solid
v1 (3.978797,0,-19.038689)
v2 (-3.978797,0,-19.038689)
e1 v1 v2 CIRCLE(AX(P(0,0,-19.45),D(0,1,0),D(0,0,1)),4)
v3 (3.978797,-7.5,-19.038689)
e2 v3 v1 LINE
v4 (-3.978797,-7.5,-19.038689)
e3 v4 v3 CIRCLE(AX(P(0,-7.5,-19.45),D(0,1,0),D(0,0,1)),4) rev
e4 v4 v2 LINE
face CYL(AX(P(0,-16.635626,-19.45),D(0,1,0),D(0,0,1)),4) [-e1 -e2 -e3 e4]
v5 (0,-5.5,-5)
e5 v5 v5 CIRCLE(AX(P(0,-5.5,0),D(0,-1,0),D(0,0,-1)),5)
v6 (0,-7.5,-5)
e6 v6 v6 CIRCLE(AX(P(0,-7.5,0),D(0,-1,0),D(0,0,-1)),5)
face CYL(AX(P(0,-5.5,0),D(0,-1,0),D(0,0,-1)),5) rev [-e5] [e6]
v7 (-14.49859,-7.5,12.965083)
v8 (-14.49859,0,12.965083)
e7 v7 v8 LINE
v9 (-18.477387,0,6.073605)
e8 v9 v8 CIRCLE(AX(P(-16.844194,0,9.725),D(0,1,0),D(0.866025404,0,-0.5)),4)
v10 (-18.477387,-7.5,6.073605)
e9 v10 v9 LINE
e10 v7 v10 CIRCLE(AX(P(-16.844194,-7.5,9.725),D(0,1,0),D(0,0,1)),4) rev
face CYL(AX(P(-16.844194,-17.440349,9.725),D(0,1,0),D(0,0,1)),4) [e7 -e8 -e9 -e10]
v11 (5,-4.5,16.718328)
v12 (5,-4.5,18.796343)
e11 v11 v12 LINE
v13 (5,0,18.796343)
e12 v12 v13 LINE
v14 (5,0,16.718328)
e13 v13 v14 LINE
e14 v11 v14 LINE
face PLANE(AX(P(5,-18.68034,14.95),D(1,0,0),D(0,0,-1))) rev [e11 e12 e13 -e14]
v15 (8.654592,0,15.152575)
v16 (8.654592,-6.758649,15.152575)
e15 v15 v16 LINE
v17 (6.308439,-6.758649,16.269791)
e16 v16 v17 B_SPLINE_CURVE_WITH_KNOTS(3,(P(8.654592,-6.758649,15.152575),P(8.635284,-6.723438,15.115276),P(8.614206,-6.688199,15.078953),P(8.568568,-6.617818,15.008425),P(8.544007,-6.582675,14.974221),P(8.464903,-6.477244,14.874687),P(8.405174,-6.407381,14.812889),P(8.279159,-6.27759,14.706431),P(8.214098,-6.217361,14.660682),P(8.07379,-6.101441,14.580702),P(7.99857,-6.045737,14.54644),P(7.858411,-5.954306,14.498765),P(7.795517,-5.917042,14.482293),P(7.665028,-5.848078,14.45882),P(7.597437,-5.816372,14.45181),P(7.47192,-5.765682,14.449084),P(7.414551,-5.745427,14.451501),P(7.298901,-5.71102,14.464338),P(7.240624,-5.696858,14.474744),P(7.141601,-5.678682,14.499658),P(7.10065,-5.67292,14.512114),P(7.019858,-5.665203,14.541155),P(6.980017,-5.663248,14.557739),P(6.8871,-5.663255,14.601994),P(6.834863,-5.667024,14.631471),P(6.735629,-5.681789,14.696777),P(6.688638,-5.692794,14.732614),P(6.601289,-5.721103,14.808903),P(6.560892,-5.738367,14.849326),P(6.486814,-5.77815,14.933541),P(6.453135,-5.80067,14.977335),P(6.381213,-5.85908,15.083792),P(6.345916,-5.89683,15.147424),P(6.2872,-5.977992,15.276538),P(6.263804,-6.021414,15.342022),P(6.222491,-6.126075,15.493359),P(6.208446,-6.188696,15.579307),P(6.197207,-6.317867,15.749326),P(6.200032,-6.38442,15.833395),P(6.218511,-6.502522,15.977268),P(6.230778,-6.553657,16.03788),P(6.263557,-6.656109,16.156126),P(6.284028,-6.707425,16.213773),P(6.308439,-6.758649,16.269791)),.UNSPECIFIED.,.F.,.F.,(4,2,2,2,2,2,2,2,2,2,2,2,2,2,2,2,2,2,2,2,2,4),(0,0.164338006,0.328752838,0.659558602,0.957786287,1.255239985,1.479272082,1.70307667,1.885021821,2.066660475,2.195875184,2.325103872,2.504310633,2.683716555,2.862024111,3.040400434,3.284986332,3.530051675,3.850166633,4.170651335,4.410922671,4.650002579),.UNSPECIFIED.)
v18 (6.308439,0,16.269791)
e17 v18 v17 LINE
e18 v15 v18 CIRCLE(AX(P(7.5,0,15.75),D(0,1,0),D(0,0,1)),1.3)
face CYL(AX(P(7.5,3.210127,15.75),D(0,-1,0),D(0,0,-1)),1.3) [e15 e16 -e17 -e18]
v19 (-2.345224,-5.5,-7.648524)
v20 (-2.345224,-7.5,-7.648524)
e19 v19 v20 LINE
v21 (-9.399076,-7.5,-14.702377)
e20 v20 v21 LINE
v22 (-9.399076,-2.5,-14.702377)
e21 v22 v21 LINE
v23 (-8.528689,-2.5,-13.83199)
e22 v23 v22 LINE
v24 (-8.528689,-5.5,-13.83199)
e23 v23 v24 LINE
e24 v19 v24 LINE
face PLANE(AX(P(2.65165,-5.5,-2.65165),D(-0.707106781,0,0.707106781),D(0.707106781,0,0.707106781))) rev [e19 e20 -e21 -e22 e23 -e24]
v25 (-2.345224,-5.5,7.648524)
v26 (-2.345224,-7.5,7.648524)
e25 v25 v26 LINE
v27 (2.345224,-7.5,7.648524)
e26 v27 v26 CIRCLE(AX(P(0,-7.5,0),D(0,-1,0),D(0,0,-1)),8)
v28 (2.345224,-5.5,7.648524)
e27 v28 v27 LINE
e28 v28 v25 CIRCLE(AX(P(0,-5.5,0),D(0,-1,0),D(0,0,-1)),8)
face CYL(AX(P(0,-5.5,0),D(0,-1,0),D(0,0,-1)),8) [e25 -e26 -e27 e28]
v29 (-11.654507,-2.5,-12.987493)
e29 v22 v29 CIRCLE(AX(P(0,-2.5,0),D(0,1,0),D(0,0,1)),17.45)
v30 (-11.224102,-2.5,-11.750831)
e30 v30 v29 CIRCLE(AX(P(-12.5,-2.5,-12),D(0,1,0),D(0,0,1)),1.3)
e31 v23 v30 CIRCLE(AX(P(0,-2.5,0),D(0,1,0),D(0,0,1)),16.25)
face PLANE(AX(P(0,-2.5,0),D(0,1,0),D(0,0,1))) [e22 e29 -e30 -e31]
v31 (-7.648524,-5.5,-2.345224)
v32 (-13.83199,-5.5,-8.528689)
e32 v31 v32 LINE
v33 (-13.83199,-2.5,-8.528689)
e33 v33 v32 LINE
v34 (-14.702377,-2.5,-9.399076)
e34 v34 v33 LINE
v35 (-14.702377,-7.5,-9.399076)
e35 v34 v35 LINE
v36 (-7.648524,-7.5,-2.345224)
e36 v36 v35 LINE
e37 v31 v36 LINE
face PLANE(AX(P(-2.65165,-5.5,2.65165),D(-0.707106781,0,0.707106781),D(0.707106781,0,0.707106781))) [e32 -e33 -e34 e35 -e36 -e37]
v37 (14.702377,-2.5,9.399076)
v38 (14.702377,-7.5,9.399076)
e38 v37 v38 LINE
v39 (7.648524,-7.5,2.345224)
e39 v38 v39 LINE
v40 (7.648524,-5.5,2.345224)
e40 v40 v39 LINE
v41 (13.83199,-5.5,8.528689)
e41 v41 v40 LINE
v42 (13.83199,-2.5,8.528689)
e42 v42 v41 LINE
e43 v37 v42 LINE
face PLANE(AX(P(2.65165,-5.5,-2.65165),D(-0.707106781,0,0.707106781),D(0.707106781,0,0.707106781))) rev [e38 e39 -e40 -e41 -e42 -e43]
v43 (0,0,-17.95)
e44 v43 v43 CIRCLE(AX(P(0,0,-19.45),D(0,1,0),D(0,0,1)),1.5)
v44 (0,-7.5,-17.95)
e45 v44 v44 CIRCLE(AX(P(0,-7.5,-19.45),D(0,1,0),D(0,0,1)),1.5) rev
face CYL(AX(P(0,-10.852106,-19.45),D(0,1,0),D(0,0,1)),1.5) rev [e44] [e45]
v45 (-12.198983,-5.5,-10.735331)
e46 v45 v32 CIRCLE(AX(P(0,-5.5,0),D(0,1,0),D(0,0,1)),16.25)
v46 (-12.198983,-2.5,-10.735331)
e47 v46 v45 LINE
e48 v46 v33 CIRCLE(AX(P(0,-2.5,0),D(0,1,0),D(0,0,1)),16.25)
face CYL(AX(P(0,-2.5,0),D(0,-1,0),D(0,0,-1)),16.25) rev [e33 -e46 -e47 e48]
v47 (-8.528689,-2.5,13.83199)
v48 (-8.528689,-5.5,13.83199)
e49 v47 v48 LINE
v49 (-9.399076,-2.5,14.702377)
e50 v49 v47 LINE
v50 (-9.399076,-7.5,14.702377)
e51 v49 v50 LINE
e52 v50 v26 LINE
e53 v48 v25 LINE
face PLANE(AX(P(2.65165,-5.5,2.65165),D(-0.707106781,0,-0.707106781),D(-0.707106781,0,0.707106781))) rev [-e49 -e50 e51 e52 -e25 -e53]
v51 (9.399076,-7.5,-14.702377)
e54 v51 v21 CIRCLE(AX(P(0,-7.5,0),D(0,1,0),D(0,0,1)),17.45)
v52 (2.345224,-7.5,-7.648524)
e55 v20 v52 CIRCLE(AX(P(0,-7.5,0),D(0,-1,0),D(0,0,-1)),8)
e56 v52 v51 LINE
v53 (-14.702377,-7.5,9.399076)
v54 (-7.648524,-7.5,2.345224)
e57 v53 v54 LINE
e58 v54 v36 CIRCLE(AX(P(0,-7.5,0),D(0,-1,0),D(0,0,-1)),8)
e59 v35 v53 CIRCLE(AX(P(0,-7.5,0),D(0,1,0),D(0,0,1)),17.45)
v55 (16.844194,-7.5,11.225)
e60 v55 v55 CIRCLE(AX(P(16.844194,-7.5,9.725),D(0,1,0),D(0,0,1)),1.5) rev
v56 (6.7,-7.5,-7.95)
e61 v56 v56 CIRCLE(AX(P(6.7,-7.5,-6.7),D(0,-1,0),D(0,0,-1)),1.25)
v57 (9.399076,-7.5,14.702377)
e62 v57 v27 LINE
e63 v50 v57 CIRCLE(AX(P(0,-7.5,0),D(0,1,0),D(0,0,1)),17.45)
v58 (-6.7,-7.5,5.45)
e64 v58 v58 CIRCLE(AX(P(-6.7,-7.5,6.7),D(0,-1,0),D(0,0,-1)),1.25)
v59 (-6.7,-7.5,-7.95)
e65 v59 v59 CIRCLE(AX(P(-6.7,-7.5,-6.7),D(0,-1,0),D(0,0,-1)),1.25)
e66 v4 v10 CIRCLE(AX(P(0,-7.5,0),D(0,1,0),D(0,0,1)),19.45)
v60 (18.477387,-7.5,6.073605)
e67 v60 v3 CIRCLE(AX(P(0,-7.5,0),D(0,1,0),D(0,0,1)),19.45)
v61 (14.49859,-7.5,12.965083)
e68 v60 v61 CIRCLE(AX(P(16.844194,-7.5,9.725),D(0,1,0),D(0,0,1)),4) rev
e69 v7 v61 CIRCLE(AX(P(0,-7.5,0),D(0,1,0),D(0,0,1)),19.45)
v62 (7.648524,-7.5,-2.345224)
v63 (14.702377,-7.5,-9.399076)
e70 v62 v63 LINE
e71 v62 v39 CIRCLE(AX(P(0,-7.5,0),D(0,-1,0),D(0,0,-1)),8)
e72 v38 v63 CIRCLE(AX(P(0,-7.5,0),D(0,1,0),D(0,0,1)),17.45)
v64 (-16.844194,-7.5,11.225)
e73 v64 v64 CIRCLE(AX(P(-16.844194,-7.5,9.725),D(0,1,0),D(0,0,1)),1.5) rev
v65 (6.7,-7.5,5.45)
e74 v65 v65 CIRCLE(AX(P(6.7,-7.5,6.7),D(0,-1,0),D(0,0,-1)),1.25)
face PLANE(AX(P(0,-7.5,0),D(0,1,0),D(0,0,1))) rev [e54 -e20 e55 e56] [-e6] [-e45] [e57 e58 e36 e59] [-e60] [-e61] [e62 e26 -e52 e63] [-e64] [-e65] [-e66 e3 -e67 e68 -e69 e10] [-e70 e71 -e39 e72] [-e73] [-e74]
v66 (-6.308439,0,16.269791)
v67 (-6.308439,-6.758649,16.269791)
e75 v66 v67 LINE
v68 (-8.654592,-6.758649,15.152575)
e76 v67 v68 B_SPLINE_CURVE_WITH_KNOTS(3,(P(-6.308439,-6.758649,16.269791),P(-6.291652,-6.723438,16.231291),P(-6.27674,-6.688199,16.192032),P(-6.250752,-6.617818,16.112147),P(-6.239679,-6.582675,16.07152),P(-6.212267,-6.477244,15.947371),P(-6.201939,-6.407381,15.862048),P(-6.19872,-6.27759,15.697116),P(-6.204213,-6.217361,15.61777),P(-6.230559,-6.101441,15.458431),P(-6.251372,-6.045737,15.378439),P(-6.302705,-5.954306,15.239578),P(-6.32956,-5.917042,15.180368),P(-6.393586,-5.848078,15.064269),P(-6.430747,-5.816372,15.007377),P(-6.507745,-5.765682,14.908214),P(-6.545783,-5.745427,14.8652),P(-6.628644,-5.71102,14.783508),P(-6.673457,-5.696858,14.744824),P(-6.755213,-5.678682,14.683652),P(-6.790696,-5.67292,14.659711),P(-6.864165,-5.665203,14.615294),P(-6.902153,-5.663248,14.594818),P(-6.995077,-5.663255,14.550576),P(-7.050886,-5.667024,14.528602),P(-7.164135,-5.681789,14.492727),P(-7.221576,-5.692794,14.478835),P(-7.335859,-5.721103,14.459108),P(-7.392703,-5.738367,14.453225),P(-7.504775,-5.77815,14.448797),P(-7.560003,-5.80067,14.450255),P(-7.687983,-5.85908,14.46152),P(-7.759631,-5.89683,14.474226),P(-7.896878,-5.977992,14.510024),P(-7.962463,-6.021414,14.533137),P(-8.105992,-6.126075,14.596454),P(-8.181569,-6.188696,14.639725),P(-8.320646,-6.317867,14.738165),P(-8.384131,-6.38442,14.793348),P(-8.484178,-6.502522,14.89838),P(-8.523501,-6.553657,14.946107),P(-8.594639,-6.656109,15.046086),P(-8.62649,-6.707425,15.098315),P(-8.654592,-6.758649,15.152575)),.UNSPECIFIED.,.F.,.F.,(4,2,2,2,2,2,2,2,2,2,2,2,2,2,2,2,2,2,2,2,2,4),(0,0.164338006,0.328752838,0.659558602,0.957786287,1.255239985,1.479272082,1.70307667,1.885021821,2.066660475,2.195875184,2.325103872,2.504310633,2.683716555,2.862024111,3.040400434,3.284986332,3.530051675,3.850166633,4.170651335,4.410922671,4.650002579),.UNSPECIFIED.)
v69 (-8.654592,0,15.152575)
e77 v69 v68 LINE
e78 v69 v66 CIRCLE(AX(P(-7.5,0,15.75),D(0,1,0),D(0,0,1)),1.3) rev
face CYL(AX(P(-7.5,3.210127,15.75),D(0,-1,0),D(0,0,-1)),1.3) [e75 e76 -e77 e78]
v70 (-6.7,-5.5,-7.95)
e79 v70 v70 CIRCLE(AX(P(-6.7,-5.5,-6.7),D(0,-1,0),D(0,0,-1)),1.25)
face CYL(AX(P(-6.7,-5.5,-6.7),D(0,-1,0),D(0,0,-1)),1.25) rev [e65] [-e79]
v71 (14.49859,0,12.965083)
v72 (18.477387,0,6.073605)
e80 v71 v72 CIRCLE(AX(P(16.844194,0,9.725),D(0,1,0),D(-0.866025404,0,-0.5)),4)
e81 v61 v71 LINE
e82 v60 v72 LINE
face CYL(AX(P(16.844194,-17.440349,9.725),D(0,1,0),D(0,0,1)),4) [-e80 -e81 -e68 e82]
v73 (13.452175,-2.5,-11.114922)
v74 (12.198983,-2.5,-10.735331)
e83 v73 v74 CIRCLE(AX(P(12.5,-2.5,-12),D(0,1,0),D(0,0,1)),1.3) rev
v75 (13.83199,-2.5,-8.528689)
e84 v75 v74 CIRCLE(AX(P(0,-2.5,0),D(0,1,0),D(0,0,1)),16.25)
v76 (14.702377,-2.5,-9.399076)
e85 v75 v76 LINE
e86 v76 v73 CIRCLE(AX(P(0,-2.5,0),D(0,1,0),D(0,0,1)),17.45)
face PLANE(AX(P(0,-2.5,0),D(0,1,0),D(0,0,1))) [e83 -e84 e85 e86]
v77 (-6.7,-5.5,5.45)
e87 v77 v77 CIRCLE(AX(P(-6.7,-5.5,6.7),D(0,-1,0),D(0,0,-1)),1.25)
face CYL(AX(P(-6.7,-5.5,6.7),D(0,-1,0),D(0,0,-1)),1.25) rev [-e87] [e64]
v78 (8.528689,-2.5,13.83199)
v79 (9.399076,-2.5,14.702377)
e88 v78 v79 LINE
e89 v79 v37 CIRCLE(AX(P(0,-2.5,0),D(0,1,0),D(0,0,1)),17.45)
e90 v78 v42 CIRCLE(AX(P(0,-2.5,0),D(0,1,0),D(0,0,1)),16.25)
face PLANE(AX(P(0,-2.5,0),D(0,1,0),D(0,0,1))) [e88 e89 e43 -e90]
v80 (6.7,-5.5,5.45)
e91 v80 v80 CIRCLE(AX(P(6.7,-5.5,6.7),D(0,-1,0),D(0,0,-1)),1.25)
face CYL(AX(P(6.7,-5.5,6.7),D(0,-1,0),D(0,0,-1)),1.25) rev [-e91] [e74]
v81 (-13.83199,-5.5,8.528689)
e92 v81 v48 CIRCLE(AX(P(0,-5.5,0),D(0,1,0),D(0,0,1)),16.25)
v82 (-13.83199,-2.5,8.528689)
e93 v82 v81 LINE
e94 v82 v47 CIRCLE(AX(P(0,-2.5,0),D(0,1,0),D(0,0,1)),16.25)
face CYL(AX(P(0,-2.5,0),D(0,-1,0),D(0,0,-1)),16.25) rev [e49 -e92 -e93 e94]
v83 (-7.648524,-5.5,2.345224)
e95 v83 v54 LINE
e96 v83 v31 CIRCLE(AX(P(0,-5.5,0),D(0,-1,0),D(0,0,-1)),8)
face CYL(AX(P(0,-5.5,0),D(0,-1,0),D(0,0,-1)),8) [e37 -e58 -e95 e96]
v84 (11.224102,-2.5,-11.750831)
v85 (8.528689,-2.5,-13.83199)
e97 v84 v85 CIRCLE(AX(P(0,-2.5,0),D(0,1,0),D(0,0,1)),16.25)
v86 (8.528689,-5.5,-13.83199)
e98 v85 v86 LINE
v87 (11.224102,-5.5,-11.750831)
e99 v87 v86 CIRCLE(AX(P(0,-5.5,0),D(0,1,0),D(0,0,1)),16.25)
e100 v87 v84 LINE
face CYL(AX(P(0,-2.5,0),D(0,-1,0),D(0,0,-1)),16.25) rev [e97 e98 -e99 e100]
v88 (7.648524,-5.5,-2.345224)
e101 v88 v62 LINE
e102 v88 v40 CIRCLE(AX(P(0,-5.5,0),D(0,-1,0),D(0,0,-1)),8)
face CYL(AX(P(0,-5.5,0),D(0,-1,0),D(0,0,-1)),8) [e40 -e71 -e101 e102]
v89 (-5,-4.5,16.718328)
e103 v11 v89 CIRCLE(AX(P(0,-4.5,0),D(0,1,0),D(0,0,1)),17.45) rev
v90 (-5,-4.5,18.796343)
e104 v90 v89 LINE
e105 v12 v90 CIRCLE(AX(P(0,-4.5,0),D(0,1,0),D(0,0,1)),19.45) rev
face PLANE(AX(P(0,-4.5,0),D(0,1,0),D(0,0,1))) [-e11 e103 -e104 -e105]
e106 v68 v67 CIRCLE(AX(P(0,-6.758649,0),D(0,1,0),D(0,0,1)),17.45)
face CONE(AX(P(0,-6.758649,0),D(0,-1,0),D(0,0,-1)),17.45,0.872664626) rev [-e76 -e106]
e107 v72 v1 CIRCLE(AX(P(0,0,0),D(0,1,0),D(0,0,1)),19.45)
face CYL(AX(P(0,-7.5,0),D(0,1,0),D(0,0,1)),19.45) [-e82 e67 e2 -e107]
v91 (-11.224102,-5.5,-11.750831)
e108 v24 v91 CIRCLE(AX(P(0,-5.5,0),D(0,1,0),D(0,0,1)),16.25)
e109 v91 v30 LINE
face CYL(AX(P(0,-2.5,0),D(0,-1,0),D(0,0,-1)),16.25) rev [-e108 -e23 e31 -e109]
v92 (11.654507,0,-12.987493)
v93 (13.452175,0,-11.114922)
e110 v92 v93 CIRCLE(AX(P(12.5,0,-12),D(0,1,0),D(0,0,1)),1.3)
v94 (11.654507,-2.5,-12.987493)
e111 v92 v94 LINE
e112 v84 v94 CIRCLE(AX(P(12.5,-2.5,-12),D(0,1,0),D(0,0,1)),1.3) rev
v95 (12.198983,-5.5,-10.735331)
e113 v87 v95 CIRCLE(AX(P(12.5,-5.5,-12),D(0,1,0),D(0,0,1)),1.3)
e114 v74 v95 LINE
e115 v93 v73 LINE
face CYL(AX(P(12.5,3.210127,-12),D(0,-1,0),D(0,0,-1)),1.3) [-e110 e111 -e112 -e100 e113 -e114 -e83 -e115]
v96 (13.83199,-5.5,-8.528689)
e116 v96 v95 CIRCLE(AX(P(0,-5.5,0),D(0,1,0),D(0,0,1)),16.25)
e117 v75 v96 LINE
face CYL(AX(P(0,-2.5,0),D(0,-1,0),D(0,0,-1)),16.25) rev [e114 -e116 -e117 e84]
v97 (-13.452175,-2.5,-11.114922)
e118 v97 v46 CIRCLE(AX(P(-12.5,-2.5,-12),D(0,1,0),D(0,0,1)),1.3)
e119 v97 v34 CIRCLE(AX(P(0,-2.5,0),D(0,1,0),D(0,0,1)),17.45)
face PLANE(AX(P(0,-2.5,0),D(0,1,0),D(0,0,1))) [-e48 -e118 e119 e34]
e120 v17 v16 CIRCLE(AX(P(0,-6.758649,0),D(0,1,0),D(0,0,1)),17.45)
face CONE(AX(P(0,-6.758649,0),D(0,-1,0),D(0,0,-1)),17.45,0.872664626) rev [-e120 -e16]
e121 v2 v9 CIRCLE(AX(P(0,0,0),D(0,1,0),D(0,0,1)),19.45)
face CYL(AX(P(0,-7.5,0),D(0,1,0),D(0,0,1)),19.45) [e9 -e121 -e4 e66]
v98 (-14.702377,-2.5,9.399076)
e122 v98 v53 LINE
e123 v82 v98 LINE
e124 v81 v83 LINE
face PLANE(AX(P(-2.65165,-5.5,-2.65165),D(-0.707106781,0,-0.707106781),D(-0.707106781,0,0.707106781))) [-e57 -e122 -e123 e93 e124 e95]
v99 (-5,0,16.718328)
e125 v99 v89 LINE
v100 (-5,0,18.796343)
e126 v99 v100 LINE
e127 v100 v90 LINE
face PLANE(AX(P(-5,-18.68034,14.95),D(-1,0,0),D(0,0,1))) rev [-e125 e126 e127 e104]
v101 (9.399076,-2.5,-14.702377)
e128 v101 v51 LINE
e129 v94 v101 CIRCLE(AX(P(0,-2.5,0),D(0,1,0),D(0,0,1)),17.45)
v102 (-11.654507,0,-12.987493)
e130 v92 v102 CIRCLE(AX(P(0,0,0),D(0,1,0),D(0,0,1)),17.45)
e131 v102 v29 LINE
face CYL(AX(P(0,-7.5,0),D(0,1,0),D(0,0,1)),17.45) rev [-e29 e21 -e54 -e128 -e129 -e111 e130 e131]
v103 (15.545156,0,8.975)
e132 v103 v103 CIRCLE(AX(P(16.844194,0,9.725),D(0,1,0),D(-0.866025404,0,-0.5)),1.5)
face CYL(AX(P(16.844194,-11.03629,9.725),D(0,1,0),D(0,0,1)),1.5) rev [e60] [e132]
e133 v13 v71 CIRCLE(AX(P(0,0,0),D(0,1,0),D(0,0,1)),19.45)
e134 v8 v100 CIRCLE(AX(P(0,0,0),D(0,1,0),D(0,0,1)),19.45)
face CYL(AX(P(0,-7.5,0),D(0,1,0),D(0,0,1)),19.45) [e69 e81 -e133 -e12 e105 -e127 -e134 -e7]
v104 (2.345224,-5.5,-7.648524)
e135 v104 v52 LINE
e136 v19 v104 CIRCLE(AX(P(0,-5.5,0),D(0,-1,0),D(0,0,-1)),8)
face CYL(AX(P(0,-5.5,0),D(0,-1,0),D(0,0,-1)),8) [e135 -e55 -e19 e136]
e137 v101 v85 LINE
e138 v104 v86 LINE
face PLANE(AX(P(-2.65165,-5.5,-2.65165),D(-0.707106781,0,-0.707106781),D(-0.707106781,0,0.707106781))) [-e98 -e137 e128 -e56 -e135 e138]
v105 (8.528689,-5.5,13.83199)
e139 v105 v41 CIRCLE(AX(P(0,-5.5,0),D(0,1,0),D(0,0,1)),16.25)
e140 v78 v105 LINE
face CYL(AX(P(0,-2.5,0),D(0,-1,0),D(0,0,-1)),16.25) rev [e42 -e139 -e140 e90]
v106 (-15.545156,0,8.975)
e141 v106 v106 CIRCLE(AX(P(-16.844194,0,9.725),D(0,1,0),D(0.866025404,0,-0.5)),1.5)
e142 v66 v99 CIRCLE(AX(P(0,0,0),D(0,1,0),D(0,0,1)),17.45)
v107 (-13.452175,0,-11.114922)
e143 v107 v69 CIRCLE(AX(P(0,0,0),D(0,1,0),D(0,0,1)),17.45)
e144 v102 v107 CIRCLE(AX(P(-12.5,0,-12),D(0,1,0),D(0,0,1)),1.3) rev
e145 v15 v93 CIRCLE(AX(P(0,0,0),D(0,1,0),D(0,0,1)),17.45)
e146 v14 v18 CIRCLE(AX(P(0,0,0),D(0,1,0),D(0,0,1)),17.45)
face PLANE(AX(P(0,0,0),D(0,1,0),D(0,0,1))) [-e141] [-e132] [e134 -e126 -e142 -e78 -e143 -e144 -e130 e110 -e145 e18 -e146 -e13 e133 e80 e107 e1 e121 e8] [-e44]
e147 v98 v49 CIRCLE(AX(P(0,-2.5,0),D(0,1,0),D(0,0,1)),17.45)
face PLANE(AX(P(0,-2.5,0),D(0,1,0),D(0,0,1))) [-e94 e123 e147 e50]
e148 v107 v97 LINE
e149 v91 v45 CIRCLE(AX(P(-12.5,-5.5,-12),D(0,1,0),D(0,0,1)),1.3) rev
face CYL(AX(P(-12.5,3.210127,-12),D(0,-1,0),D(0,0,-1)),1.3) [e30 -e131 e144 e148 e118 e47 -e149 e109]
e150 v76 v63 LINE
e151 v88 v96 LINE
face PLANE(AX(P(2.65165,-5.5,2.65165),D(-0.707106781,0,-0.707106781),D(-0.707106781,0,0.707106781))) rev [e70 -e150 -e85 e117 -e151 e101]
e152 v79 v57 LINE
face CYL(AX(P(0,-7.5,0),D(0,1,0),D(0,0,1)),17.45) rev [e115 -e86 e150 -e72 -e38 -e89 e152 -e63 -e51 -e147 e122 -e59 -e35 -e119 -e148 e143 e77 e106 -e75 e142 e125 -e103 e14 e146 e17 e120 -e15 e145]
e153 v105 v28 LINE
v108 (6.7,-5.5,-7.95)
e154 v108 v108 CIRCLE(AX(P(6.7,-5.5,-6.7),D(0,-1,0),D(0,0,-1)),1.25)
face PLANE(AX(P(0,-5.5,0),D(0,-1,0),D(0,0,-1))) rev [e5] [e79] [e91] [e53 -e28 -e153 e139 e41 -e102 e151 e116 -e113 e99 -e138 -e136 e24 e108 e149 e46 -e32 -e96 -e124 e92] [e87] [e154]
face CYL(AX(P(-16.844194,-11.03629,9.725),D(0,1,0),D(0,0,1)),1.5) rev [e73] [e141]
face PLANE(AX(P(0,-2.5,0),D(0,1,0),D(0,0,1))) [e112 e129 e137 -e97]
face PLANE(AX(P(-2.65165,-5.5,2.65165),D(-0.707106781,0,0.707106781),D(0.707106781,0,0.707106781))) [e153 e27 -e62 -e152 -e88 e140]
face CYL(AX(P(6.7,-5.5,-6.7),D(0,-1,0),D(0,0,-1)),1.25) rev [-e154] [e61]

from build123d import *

# Parameters (mm, degrees)
ESQUISSE1_R                                = 19.45
ESQUISSE1_R_2                              = 17.45
BOSS_EXTRU_1_DEPTH                         = 7.5
BOSS_EXTRU_2_START                         = -2
ESQUISSE2_R                                = 1.25
BOSS_EXTRU_2_DEPTH                         = 2
BOSS_EXTRU_3_START                         = 3
BOSS_EXTRU_3_DEPTH                         = 3
BOSS_EXTRU_4_REACH                         = 30.051
CHANFREIN1_SIZE                            = 1.258649447
CHANFREIN1_SIZE_2                          = 1.5
ENL_V_MAT_EXTRU_1_DEPTH                    = 7.5
BOSS_EXTRU_5_START                         = -7.5
BOSS_EXTRU_5_DEPTH                         = 7.5
R_P_TITION_CIRCULAIRE1_COUNT               = 2
R_P_TITION_CIRCULAIRE1_ANGLE               = 120
R_P_TITION_CIRCULAIRE1_THE_OTHER_WAY_COUNT = 2
R_P_TITION_CIRCULAIRE1_THE_OTHER_WAY_ANGLE = 120
ESQUISSE6_W                                = 10
ESQUISSE6_H                                = 5
ENL_V_MAT_EXTRU_2_DEPTH                    = 4.5


with BuildPart() as part:
    # Esquisse1 → Boss.-Extru.1 (new body)
    with BuildSketch(Plane(origin=(0, 0, 0), x_dir=(1, 0, 0), z_dir=(0, 1, 0))):
        with Locations(Location((0, 0, 0), (0, 0, 270))):
            Circle(ESQUISSE1_R)
        with Locations(Location((0, 0, 0), (0, 0, 270))):
            Circle(ESQUISSE1_R_2, mode=Mode.SUBTRACT)
    extrude(amount=-BOSS_EXTRU_1_DEPTH)

    # Esquisse2 → Boss.-Extru.2 (add)
    # profile 1 of 16: a face of its own
    with BuildSketch(Plane(origin=(0, -7.5, 0), x_dir=(-1, 0, 0), z_dir=(0, -1, 0)).offset(BOSS_EXTRU_2_START)):
        with BuildLine():
            Line((2.345223593, -7.648524452), (9.39907569, -14.702376549))
            ThreePointArc((9.39907569, -14.702376549), (12.339013332, -12.339013332), (14.702376549, -9.39907569))
            Line((14.702376549, -9.39907569), (7.648524452, -2.345223593))
            ThreePointArc((7.648524452, -2.345223593), (5.656854249, -5.656854249), (2.345223593, -7.648524452))
        make_face()
        with Locations(Location((6.7, -6.7, 0), (0, 0, 90))):
            Circle(ESQUISSE2_R, mode=Mode.SUBTRACT)
    # profile 2 of 16: a face of its own
    with BuildSketch(Plane(origin=(0, -7.5, 0), x_dir=(-1, 0, 0), z_dir=(0, -1, 0)).offset(BOSS_EXTRU_2_START)):
        with BuildLine():
            Line((5.303300859, 0), (7.648524452, -2.345223593))
            ThreePointArc((7.648524452, -2.345223593), (7.91164318, -1.185707464), (8, 0))
            ThreePointArc((8, 0), (7.91164318, 1.185707464), (7.648524452, 2.345223593))
            Line((7.648524452, 2.345223593), (5.303300859, 0))
        make_face()
    # profile 3 of 16: a face of its own
    with BuildSketch(Plane(origin=(0, -7.5, 0), x_dir=(-1, 0, 0), z_dir=(0, -1, 0)).offset(BOSS_EXTRU_2_START)):
        with BuildLine():
            Line((0.313114563, -4.990186296), (0, -5.303300859))
            Line((0, -5.303300859), (2.345223593, -7.648524452))
            ThreePointArc((2.345223593, -7.648524452), (5.656854249, -5.656854249), (7.648524452, -2.345223593))
            Line((7.648524452, -2.345223593), (5.303300859, 0))
            Line((5.303300859, 0), (4.990186296, -0.313114563))
            ThreePointArc((4.990186296, -0.313114563), (3.535533906, -3.535533906), (0.313114563, -4.990186296))
        make_face()
    # profile 4 of 16: a face of its own
    with BuildSketch(Plane(origin=(0, -7.5, 0), x_dir=(-1, 0, 0), z_dir=(0, -1, 0)).offset(BOSS_EXTRU_2_START)):
        with BuildLine():
            Line((4.990186296, 0.313114563), (5.303300859, 0))
            Line((5.303300859, 0), (7.648524452, 2.345223593))
            ThreePointArc((7.648524452, 2.345223593), (5.656854249, 5.656854249), (2.345223593, 7.648524452))
            Line((2.345223593, 7.648524452), (0, 5.303300859))
            Line((0, 5.303300859), (0.313114563, 4.990186296))
            ThreePointArc((0.313114563, 4.990186296), (3.535533906, 3.535533906), (4.990186296, 0.313114563))
        make_face()
    # profile 5 of 16: a face of its own
    with BuildSketch(Plane(origin=(0, -7.5, 0), x_dir=(-1, 0, 0), z_dir=(0, -1, 0)).offset(BOSS_EXTRU_2_START)):
        with BuildLine():
            ThreePointArc((5, 0), (4.997545972, -0.156634158), (4.990186296, -0.313114563))
            Line((4.990186296, -0.313114563), (5.303300859, 0))
            Line((5.303300859, 0), (4.990186296, 0.313114563))
            ThreePointArc((4.990186296, 0.313114563), (4.997545972, 0.156634158), (5, 0))
        make_face()
    # profile 6 of 16: a face of its own
    with BuildSketch(Plane(origin=(0, -7.5, 0), x_dir=(-1, 0, 0), z_dir=(0, -1, 0)).offset(BOSS_EXTRU_2_START)):
        with BuildLine():
            ThreePointArc((14.702376549, 9.39907569), (12.339013332, 12.339013332), (9.39907569, 14.702376549))
            Line((9.39907569, 14.702376549), (2.345223593, 7.648524452))
            ThreePointArc((2.345223593, 7.648524452), (5.656854249, 5.656854249), (7.648524452, 2.345223593))
            Line((7.648524452, 2.345223593), (14.702376549, 9.39907569))
        make_face()
        with Locations(Location((6.7, 6.7, 0), (0, 0, 90))):
            Circle(ESQUISSE2_R, mode=Mode.SUBTRACT)
    # profile 7 of 16: a face of its own
    with BuildSketch(Plane(origin=(0, -7.5, 0), x_dir=(-1, 0, 0), z_dir=(0, -1, 0)).offset(BOSS_EXTRU_2_START)):
        with BuildLine():
            Line((0, 5.303300859), (-0.313114563, 4.990186296))
            ThreePointArc((-0.313114563, 4.990186296), (0, 5), (0.313114563, 4.990186296))
            Line((0.313114563, 4.990186296), (0, 5.303300859))
        make_face()
    # profile 8 of 16: a face of its own
    with BuildSketch(Plane(origin=(0, -7.5, 0), x_dir=(-1, 0, 0), z_dir=(0, -1, 0)).offset(BOSS_EXTRU_2_START)):
        with BuildLine():
            Line((-7.648524452, 2.345223593), (-5.303300859, 0))
            Line((-5.303300859, 0), (-4.990186296, 0.313114563))
            ThreePointArc((-4.990186296, 0.313114563), (-3.535533906, 3.535533906), (-0.313114563, 4.990186296))
            Line((-0.313114563, 4.990186296), (0, 5.303300859))
            Line((0, 5.303300859), (-2.345223593, 7.648524452))
            ThreePointArc((-2.345223593, 7.648524452), (-5.656854249, 5.656854249), (-7.648524452, 2.345223593))
        make_face()
    # profile 9 of 16: a face of its own
    with BuildSketch(Plane(origin=(0, -7.5, 0), x_dir=(-1, 0, 0), z_dir=(0, -1, 0)).offset(BOSS_EXTRU_2_START)):
        with BuildLine():
            Line((-4.990186296, 0.313114563), (-5.303300859, 0))
            Line((-5.303300859, 0), (-4.990186296, -0.313114563))
            ThreePointArc((-4.990186296, -0.313114563), (-5, 0), (-4.990186296, 0.313114563))
        make_face()
    # profile 10 of 16: a face of its own
    with BuildSketch(Plane(origin=(0, -7.5, 0), x_dir=(-1, 0, 0), z_dir=(0, -1, 0)).offset(BOSS_EXTRU_2_START)):
        with BuildLine():
            ThreePointArc((-7.648524452, -2.345223593), (-5.656854249, -5.656854249), (-2.345223593, -7.648524452))
            Line((-2.345223593, -7.648524452), (0, -5.303300859))
            Line((0, -5.303300859), (-0.313114563, -4.990186296))
            ThreePointArc((-0.313114563, -4.990186296), (-3.535533906, -3.535533906), (-4.990186296, -0.313114563))
            Line((-4.990186296, -0.313114563), (-5.303300859, 0))
            Line((-5.303300859, 0), (-7.648524452, -2.345223593))
        make_face()
    # profile 11 of 16: a face of its own
    with BuildSketch(Plane(origin=(0, -7.5, 0), x_dir=(-1, 0, 0), z_dir=(0, -1, 0)).offset(BOSS_EXTRU_2_START)):
        with BuildLine():
            ThreePointArc((-7.648524452, 2.345223593), (-8, 0), (-7.648524452, -2.345223593))
            Line((-7.648524452, -2.345223593), (-5.303300859, 0))
            Line((-5.303300859, 0), (-7.648524452, 2.345223593))
        make_face()
    # profile 12 of 16: a face of its own
    with BuildSketch(Plane(origin=(0, -7.5, 0), x_dir=(-1, 0, 0), z_dir=(0, -1, 0)).offset(BOSS_EXTRU_2_START)):
        with BuildLine():
            Line((-0.313114563, -4.990186296), (0, -5.303300859))
            Line((0, -5.303300859), (0.313114563, -4.990186296))
            ThreePointArc((0.313114563, -4.990186296), (0, -5), (-0.313114563, -4.990186296))
        make_face()
    # profile 13 of 16: a face of its own
    with BuildSketch(Plane(origin=(0, -7.5, 0), x_dir=(-1, 0, 0), z_dir=(0, -1, 0)).offset(BOSS_EXTRU_2_START)):
        with BuildLine():
            Line((0, -5.303300859), (-2.345223593, -7.648524452))
            ThreePointArc((-2.345223593, -7.648524452), (0, -8), (2.345223593, -7.648524452))
            Line((2.345223593, -7.648524452), (0, -5.303300859))
        make_face()
    # profile 14 of 16: a face of its own
    with BuildSketch(Plane(origin=(0, -7.5, 0), x_dir=(-1, 0, 0), z_dir=(0, -1, 0)).offset(BOSS_EXTRU_2_START)):
        with BuildLine():
            ThreePointArc((2.345223593, 7.648524452), (0, 8), (-2.345223593, 7.648524452))
            Line((-2.345223593, 7.648524452), (0, 5.303300859))
            Line((0, 5.303300859), (2.345223593, 7.648524452))
        make_face()
    # profile 15 of 16: a face of its own
    with BuildSketch(Plane(origin=(0, -7.5, 0), x_dir=(-1, 0, 0), z_dir=(0, -1, 0)).offset(BOSS_EXTRU_2_START)):
        with BuildLine():
            ThreePointArc((-9.39907569, 14.702376549), (-12.339013332, 12.339013332), (-14.702376549, 9.39907569))
            Line((-14.702376549, 9.39907569), (-7.648524452, 2.345223593))
            ThreePointArc((-7.648524452, 2.345223593), (-5.656854249, 5.656854249), (-2.345223593, 7.648524452))
            Line((-2.345223593, 7.648524452), (-9.39907569, 14.702376549))
        make_face()
        with Locations(Location((-6.7, 6.7, 0), (0, 0, 90))):
            Circle(ESQUISSE2_R, mode=Mode.SUBTRACT)
    # profile 16 of 16: a face of its own
    with BuildSketch(Plane(origin=(0, -7.5, 0), x_dir=(-1, 0, 0), z_dir=(0, -1, 0)).offset(BOSS_EXTRU_2_START)):
        with BuildLine():
            ThreePointArc((-14.702376549, -9.39907569), (-12.339013332, -12.339013332), (-9.39907569, -14.702376549))
            Line((-9.39907569, -14.702376549), (-2.345223593, -7.648524452))
            ThreePointArc((-2.345223593, -7.648524452), (-5.656854249, -5.656854249), (-7.648524452, -2.345223593))
            Line((-7.648524452, -2.345223593), (-14.702376549, -9.39907569))
        make_face()
        with Locations(Location((-6.7, -6.7, 0), (0, 0, 90))):
            Circle(ESQUISSE2_R, mode=Mode.SUBTRACT)
    extrude(amount=BOSS_EXTRU_2_DEPTH)

    # Esquisse3 → Boss.-Extru.3 (add)
    with BuildSketch(Plane(origin=(0, -5.5, 0), x_dir=(1, 0, 0), z_dir=(0, 1, 0)).offset(BOSS_EXTRU_3_START)):
        with BuildLine():
            ThreePointArc((-13.831990317, 8.528689458), (-11.490485194, 11.490485194), (-8.528689458, 13.831990317))
            Line((-8.528689458, 13.831990317), (-9.39907569, 14.702376549))
            ThreePointArc((-9.39907569, 14.702376549), (-12.339013332, 12.339013332), (-14.702376549, 9.39907569))
            Line((-14.702376549, 9.39907569), (-13.831990317, 8.528689458))
        make_face()
        with BuildLine():
            Line((9.39907569, 14.702376549), (8.528689458, 13.831990317))
            ThreePointArc((8.528689458, 13.831990317), (11.490485194, 11.490485194), (13.831990317, 8.528689458))
            Line((13.831990317, 8.528689458), (14.702376549, 9.39907569))
            ThreePointArc((14.702376549, 9.39907569), (12.339013332, 12.339013332), (9.39907569, 14.702376549))
        make_face()
        with BuildLine():
            ThreePointArc((-8.528689458, -13.831990317), (-11.490485194, -11.490485194), (-13.831990317, -8.528689458))
            Line((-13.831990317, -8.528689458), (-14.702376549, -9.39907569))
            ThreePointArc((-14.702376549, -9.39907569), (-12.339013332, -12.339013332), (-9.39907569, -14.702376549))
            Line((-9.39907569, -14.702376549), (-8.528689458, -13.831990317))
        make_face()
        with BuildLine():
            Line((14.702376549, -9.39907569), (13.831990317, -8.528689458))
            ThreePointArc((13.831990317, -8.528689458), (11.490485194, -11.490485194), (8.528689458, -13.831990317))
            Line((8.528689458, -13.831990317), (9.39907569, -14.702376549))
            ThreePointArc((9.39907569, -14.702376549), (12.339013332, -12.339013332), (14.702376549, -9.39907569))
        make_face()
    extrude(amount=-BOSS_EXTRU_3_DEPTH)

    # Boss.-Extru.4: up to this face of the body (flat: up to its plane)
    boss_extru_4_end = Plane(part.part.faces().sort_by_distance((0, 0, -18.899870924))[0])
    # Esquisse4 → Boss.-Extru.4 (add, up to the picked face)
    with BuildSketch(Plane(origin=(0, -5.5, 0), x_dir=(1, 0, 0), z_dir=(0, 1, 0)), mode=Mode.PRIVATE) as boss_extru_4_sk1:
        with BuildLine():
            ThreePointArc((-12.198982549, 10.735330678), (-11.722543967, 11.253642208), (-11.22410238, 11.750830854))
            ThreePointArc((-11.22410238, 11.750830854), (-11.272234731, 12.42730837), (-11.65450707, 12.987492636))
            ThreePointArc((-11.65450707, 12.987492636), (-12.588208752, 12.084680402), (-13.452174862, 11.114922019))
            ThreePointArc((-13.452174862, 11.114922019), (-12.876860571, 10.75582312), (-12.198982549, 10.735330678))
        make_face()
    boss_extru_4_tool1 = split(extrude(boss_extru_4_sk1.sketch, amount=BOSS_EXTRU_4_REACH, mode=Mode.PRIVATE), bisect_by=boss_extru_4_end, keep=Keep.BOTH, mode=Mode.PRIVATE)
    # Esquisse4 → Boss.-Extru.4 (add, up to the picked face)
    with BuildSketch(Plane(origin=(0, -5.5, 0), x_dir=(1, 0, 0), z_dir=(0, 1, 0)), mode=Mode.PRIVATE) as boss_extru_4_sk2:
        with BuildLine():
            ThreePointArc((-12.198982549, 10.735330678), (-11.562196483, 11.099708623), (-11.22410238, 11.750830854))
            ThreePointArc((-11.22410238, 11.750830854), (-11.722543967, 11.253642208), (-12.198982549, 10.735330678))
        make_face()
    boss_extru_4_tool2 = split(extrude(boss_extru_4_sk2.sketch, amount=BOSS_EXTRU_4_REACH, mode=Mode.PRIVATE), bisect_by=boss_extru_4_end, keep=Keep.BOTH, mode=Mode.PRIVATE)
    # Esquisse4 → Boss.-Extru.4 (add, up to the picked face)
    with BuildSketch(Plane(origin=(0, -5.5, 0), x_dir=(1, 0, 0), z_dir=(0, 1, 0)), mode=Mode.PRIVATE) as boss_extru_4_sk3:
        with BuildLine():
            ThreePointArc((12.198982549, 10.735330678), (11.722543967, 11.253642208), (11.22410238, 11.750830854))
            ThreePointArc((11.22410238, 11.750830854), (11.562196483, 11.099708623), (12.198982549, 10.735330678))
        make_face()
    boss_extru_4_tool3 = split(extrude(boss_extru_4_sk3.sketch, amount=BOSS_EXTRU_4_REACH, mode=Mode.PRIVATE), bisect_by=boss_extru_4_end, keep=Keep.BOTH, mode=Mode.PRIVATE)
    # Esquisse4 → Boss.-Extru.4 (add, up to the picked face)
    with BuildSketch(Plane(origin=(0, -5.5, 0), x_dir=(1, 0, 0), z_dir=(0, 1, 0)), mode=Mode.PRIVATE) as boss_extru_4_sk4:
        with BuildLine():
            ThreePointArc((11.65450707, 12.987492636), (11.272234731, 12.42730837), (11.22410238, 11.750830854))
            ThreePointArc((11.22410238, 11.750830854), (11.722543967, 11.253642208), (12.198982549, 10.735330678))
            ThreePointArc((12.198982549, 10.735330678), (12.876860571, 10.75582312), (13.452174862, 11.114922019))
            ThreePointArc((13.452174862, 11.114922019), (12.588208752, 12.084680402), (11.65450707, 12.987492636))
        make_face()
    boss_extru_4_tool4 = split(extrude(boss_extru_4_sk4.sketch, amount=BOSS_EXTRU_4_REACH, mode=Mode.PRIVATE), bisect_by=boss_extru_4_end, keep=Keep.BOTH, mode=Mode.PRIVATE)
    # Esquisse4 → Boss.-Extru.4 (add, up to the picked face)
    with BuildSketch(Plane(origin=(0, -5.5, 0), x_dir=(1, 0, 0), z_dir=(0, 1, 0)), mode=Mode.PRIVATE) as boss_extru_4_sk5:
        with BuildLine():
            ThreePointArc((6.308439087, -16.269790911), (7.502340978, -15.754916053), (8.654592336, -15.152575078))
            ThreePointArc((8.654592336, -15.152575078), (6.941086345, -14.576281326), (6.308439087, -16.269790911))
        make_face()
    boss_extru_4_tool5 = split(extrude(boss_extru_4_sk5.sketch, amount=BOSS_EXTRU_4_REACH, mode=Mode.PRIVATE), bisect_by=boss_extru_4_end, keep=Keep.BOTH, mode=Mode.PRIVATE)
    # Esquisse4 → Boss.-Extru.4 (add, up to the picked face)
    with BuildSketch(Plane(origin=(0, -5.5, 0), x_dir=(1, 0, 0), z_dir=(0, 1, 0)), mode=Mode.PRIVATE) as boss_extru_4_sk6:
        with BuildLine():
            ThreePointArc((-6.308439087, -16.269790911), (-6.941086345, -14.576281326), (-8.654592336, -15.152575078))
            ThreePointArc((-8.654592336, -15.152575078), (-7.502340978, -15.754916053), (-6.308439087, -16.269790911))
        make_face()
    boss_extru_4_tool6 = split(extrude(boss_extru_4_sk6.sketch, amount=BOSS_EXTRU_4_REACH, mode=Mode.PRIVATE), bisect_by=boss_extru_4_end, keep=Keep.BOTH, mode=Mode.PRIVATE)
    add(boss_extru_4_tool1.solids().sort_by(Axis((-12.181108, -5.5, -11.693863), (0, 1, 0)))[0])
    add(boss_extru_4_tool2.solids().sort_by(Axis((-11.655738, -5.5, -11.189508), (0, 1, 0)))[0])
    add(boss_extru_4_tool3.solids().sort_by(Axis((11.655738, -5.5, -11.189508), (0, 1, 0)))[0])
    add(boss_extru_4_tool4.solids().sort_by(Axis((12.181108, -5.5, -11.693863), (0, 1, 0)))[0])
    add(boss_extru_4_tool5.solids().sort_by(Axis((7.260346, -5.5, 15.246726), (0, 1, 0)))[0])
    add(boss_extru_4_tool6.solids().sort_by(Axis((-7.260346, -5.5, 15.246726), (0, 1, 0)))[0])

    # Chanfrein1
    # the kernel refuses this chamfer: 1.5, 1.258649447 mm, written as the material it adds along each edge
    with BuildSketch(Plane(origin=(0, -5.5, 0), x_dir=(-0.6746573052433168, 0, 0.738131099793137), z_dir=(-0.738131099793137, 0, -0.6746573052433168))) as chanfrein1_piece_1_section:
        Polygon((17.45, -CHANFREIN1_SIZE), (17.45 - CHANFREIN1_SIZE_2, 0), (17.45, 0), align=None)
    chanfrein1_piece_1 = revolve(axis=Axis((0, -5.5, 0), (0, 1, 0)), revolution_arc=33.928397159, mode=Mode.PRIVATE)
    chanfrein1_piece_1 = chanfrein1_piece_1 & Plane(origin=(-7.5, -5.952007583, 15.75), x_dir=(0.9165853175591765, 0, 0.39983916220768523), z_dir=(0, -1, 0)) * Cylinder(1.3, 70, mode=Mode.PRIVATE)
    add(chanfrein1_piece_1)
    with BuildSketch(Plane(origin=(0, -5.5, 0), x_dir=(0.14779467805019864, 0, 0.9890180651232), z_dir=(-0.9890180651232, 0, 0.14779467805019864))) as chanfrein1_piece_2_section:
        Polygon((17.45, -CHANFREIN1_SIZE), (17.45 - CHANFREIN1_SIZE_2, 0), (17.45, 0), align=None)
    chanfrein1_piece_2 = revolve(axis=Axis((0, -5.5, 0), (0, 1, 0)), revolution_arc=33.928397159, mode=Mode.PRIVATE)
    chanfrein1_piece_2 = chanfrein1_piece_2 & Plane(origin=(7.5, -5.952007583, 15.75), x_dir=(0.8881479508593404, 0, -0.45955763227734), z_dir=(0, -1, 0)) * Cylinder(1.3, 70, mode=Mode.PRIVATE)
    add(chanfrein1_piece_2)

    # Esquisse5 → Enlèv. mat.-Extru.1 (cut)
    with BuildSketch(Plane(origin=(0, 0, 0), x_dir=(1, 0, 0), z_dir=(0, 1, 0))):
        with BuildLine():
            ThreePointArc((-1.498884406, 19.392159383), (-1.040009393, 18.369083508), (0, 17.95))
            Line((0, 17.95), (0, 19.45))
            ThreePointArc((0, 19.45), (-0.75, 19.435534467), (-1.498884406, 19.392159383))
        make_face()
        with BuildLine():
            Line((0, 19.45), (0, 17.95))
            ThreePointArc((0, 17.95), (1.040009393, 18.369083508), (1.498884406, 19.392159383))
            ThreePointArc((1.498884406, 19.392159383), (0.75, 19.435534467), (0, 19.45))
        make_face()
    enl_v_mat_extru_1 = extrude(amount=-ENL_V_MAT_EXTRU_1_DEPTH, mode=Mode.SUBTRACT)

    # Esquisse5<3> → Boss.-Extru.5 (add)
    with BuildSketch(Plane(origin=(0, 0, 0), x_dir=(1, 0, 0), z_dir=(0, 1, 0)).offset(BOSS_EXTRU_5_START)):
        with BuildLine():
            ThreePointArc((-1.498884406, 19.392159383), (-0.028925687, 20.949721076), (1.5, 19.45))
            ThreePointArc((1.5, 19.45), (1.499721076, 19.421074313), (1.498884406, 19.392159383))
            ThreePointArc((1.498884406, 19.392159383), (2.744536924, 19.255389299), (3.978796705, 19.038688946))
            ThreePointArc((3.978796705, 19.038688946), (3.994695659, 19.244071394), (4, 19.45))
            ThreePointArc((4, 19.45), (-0.205928606, 23.444695659), (-3.978796705, 19.038688946))
            ThreePointArc((-3.978796705, 19.038688946), (-2.744536924, 19.255389299), (-1.498884406, 19.392159383))
        make_face()
    boss_extru_5 = extrude(amount=BOSS_EXTRU_5_DEPTH)

    # Répétition circulaire1: Enlèv. mat.-Extru.1, Boss.-Extru.5 ×2 about axis
    r_p_tition_circulaire1_axis = Axis((0, -7.5, 0), (0, 1, 0))
    add([enl_v_mat_extru_1.rotate(r_p_tition_circulaire1_axis, i * R_P_TITION_CIRCULAIRE1_ANGLE / (R_P_TITION_CIRCULAIRE1_COUNT - 1)) for i in range(1, R_P_TITION_CIRCULAIRE1_COUNT)], mode=Mode.SUBTRACT)
    add([boss_extru_5.rotate(r_p_tition_circulaire1_axis, i * R_P_TITION_CIRCULAIRE1_ANGLE / (R_P_TITION_CIRCULAIRE1_COUNT - 1)) for i in range(1, R_P_TITION_CIRCULAIRE1_COUNT)])

    # Répétition circulaire1 the other way: Enlèv. mat.-Extru.1, Boss.-Extru.5 ×2 about axis
    r_p_tition_circulaire1_the_other_way_axis = Axis((0, -7.5, 0), (0, -1, 0))
    add([enl_v_mat_extru_1.rotate(r_p_tition_circulaire1_the_other_way_axis, i * R_P_TITION_CIRCULAIRE1_THE_OTHER_WAY_ANGLE / (R_P_TITION_CIRCULAIRE1_THE_OTHER_WAY_COUNT - 1)) for i in range(1, R_P_TITION_CIRCULAIRE1_THE_OTHER_WAY_COUNT)], mode=Mode.SUBTRACT)
    add([boss_extru_5.rotate(r_p_tition_circulaire1_the_other_way_axis, i * R_P_TITION_CIRCULAIRE1_THE_OTHER_WAY_ANGLE / (R_P_TITION_CIRCULAIRE1_THE_OTHER_WAY_COUNT - 1)) for i in range(1, R_P_TITION_CIRCULAIRE1_THE_OTHER_WAY_COUNT)])

    # Esquisse6 → Enlèv. mat.-Extru.2 (cut)
    with BuildSketch(Plane(origin=(0, 0, 0), x_dir=(1, 0, 0), z_dir=(0, 1, 0))):
        with Locations((0, -17.45)):
            Rectangle(ESQUISSE6_W, ESQUISSE6_H)
    extrude(amount=-ENL_V_MAT_EXTRU_2_DEPTH, mode=Mode.SUBTRACT)


solid = part.part
